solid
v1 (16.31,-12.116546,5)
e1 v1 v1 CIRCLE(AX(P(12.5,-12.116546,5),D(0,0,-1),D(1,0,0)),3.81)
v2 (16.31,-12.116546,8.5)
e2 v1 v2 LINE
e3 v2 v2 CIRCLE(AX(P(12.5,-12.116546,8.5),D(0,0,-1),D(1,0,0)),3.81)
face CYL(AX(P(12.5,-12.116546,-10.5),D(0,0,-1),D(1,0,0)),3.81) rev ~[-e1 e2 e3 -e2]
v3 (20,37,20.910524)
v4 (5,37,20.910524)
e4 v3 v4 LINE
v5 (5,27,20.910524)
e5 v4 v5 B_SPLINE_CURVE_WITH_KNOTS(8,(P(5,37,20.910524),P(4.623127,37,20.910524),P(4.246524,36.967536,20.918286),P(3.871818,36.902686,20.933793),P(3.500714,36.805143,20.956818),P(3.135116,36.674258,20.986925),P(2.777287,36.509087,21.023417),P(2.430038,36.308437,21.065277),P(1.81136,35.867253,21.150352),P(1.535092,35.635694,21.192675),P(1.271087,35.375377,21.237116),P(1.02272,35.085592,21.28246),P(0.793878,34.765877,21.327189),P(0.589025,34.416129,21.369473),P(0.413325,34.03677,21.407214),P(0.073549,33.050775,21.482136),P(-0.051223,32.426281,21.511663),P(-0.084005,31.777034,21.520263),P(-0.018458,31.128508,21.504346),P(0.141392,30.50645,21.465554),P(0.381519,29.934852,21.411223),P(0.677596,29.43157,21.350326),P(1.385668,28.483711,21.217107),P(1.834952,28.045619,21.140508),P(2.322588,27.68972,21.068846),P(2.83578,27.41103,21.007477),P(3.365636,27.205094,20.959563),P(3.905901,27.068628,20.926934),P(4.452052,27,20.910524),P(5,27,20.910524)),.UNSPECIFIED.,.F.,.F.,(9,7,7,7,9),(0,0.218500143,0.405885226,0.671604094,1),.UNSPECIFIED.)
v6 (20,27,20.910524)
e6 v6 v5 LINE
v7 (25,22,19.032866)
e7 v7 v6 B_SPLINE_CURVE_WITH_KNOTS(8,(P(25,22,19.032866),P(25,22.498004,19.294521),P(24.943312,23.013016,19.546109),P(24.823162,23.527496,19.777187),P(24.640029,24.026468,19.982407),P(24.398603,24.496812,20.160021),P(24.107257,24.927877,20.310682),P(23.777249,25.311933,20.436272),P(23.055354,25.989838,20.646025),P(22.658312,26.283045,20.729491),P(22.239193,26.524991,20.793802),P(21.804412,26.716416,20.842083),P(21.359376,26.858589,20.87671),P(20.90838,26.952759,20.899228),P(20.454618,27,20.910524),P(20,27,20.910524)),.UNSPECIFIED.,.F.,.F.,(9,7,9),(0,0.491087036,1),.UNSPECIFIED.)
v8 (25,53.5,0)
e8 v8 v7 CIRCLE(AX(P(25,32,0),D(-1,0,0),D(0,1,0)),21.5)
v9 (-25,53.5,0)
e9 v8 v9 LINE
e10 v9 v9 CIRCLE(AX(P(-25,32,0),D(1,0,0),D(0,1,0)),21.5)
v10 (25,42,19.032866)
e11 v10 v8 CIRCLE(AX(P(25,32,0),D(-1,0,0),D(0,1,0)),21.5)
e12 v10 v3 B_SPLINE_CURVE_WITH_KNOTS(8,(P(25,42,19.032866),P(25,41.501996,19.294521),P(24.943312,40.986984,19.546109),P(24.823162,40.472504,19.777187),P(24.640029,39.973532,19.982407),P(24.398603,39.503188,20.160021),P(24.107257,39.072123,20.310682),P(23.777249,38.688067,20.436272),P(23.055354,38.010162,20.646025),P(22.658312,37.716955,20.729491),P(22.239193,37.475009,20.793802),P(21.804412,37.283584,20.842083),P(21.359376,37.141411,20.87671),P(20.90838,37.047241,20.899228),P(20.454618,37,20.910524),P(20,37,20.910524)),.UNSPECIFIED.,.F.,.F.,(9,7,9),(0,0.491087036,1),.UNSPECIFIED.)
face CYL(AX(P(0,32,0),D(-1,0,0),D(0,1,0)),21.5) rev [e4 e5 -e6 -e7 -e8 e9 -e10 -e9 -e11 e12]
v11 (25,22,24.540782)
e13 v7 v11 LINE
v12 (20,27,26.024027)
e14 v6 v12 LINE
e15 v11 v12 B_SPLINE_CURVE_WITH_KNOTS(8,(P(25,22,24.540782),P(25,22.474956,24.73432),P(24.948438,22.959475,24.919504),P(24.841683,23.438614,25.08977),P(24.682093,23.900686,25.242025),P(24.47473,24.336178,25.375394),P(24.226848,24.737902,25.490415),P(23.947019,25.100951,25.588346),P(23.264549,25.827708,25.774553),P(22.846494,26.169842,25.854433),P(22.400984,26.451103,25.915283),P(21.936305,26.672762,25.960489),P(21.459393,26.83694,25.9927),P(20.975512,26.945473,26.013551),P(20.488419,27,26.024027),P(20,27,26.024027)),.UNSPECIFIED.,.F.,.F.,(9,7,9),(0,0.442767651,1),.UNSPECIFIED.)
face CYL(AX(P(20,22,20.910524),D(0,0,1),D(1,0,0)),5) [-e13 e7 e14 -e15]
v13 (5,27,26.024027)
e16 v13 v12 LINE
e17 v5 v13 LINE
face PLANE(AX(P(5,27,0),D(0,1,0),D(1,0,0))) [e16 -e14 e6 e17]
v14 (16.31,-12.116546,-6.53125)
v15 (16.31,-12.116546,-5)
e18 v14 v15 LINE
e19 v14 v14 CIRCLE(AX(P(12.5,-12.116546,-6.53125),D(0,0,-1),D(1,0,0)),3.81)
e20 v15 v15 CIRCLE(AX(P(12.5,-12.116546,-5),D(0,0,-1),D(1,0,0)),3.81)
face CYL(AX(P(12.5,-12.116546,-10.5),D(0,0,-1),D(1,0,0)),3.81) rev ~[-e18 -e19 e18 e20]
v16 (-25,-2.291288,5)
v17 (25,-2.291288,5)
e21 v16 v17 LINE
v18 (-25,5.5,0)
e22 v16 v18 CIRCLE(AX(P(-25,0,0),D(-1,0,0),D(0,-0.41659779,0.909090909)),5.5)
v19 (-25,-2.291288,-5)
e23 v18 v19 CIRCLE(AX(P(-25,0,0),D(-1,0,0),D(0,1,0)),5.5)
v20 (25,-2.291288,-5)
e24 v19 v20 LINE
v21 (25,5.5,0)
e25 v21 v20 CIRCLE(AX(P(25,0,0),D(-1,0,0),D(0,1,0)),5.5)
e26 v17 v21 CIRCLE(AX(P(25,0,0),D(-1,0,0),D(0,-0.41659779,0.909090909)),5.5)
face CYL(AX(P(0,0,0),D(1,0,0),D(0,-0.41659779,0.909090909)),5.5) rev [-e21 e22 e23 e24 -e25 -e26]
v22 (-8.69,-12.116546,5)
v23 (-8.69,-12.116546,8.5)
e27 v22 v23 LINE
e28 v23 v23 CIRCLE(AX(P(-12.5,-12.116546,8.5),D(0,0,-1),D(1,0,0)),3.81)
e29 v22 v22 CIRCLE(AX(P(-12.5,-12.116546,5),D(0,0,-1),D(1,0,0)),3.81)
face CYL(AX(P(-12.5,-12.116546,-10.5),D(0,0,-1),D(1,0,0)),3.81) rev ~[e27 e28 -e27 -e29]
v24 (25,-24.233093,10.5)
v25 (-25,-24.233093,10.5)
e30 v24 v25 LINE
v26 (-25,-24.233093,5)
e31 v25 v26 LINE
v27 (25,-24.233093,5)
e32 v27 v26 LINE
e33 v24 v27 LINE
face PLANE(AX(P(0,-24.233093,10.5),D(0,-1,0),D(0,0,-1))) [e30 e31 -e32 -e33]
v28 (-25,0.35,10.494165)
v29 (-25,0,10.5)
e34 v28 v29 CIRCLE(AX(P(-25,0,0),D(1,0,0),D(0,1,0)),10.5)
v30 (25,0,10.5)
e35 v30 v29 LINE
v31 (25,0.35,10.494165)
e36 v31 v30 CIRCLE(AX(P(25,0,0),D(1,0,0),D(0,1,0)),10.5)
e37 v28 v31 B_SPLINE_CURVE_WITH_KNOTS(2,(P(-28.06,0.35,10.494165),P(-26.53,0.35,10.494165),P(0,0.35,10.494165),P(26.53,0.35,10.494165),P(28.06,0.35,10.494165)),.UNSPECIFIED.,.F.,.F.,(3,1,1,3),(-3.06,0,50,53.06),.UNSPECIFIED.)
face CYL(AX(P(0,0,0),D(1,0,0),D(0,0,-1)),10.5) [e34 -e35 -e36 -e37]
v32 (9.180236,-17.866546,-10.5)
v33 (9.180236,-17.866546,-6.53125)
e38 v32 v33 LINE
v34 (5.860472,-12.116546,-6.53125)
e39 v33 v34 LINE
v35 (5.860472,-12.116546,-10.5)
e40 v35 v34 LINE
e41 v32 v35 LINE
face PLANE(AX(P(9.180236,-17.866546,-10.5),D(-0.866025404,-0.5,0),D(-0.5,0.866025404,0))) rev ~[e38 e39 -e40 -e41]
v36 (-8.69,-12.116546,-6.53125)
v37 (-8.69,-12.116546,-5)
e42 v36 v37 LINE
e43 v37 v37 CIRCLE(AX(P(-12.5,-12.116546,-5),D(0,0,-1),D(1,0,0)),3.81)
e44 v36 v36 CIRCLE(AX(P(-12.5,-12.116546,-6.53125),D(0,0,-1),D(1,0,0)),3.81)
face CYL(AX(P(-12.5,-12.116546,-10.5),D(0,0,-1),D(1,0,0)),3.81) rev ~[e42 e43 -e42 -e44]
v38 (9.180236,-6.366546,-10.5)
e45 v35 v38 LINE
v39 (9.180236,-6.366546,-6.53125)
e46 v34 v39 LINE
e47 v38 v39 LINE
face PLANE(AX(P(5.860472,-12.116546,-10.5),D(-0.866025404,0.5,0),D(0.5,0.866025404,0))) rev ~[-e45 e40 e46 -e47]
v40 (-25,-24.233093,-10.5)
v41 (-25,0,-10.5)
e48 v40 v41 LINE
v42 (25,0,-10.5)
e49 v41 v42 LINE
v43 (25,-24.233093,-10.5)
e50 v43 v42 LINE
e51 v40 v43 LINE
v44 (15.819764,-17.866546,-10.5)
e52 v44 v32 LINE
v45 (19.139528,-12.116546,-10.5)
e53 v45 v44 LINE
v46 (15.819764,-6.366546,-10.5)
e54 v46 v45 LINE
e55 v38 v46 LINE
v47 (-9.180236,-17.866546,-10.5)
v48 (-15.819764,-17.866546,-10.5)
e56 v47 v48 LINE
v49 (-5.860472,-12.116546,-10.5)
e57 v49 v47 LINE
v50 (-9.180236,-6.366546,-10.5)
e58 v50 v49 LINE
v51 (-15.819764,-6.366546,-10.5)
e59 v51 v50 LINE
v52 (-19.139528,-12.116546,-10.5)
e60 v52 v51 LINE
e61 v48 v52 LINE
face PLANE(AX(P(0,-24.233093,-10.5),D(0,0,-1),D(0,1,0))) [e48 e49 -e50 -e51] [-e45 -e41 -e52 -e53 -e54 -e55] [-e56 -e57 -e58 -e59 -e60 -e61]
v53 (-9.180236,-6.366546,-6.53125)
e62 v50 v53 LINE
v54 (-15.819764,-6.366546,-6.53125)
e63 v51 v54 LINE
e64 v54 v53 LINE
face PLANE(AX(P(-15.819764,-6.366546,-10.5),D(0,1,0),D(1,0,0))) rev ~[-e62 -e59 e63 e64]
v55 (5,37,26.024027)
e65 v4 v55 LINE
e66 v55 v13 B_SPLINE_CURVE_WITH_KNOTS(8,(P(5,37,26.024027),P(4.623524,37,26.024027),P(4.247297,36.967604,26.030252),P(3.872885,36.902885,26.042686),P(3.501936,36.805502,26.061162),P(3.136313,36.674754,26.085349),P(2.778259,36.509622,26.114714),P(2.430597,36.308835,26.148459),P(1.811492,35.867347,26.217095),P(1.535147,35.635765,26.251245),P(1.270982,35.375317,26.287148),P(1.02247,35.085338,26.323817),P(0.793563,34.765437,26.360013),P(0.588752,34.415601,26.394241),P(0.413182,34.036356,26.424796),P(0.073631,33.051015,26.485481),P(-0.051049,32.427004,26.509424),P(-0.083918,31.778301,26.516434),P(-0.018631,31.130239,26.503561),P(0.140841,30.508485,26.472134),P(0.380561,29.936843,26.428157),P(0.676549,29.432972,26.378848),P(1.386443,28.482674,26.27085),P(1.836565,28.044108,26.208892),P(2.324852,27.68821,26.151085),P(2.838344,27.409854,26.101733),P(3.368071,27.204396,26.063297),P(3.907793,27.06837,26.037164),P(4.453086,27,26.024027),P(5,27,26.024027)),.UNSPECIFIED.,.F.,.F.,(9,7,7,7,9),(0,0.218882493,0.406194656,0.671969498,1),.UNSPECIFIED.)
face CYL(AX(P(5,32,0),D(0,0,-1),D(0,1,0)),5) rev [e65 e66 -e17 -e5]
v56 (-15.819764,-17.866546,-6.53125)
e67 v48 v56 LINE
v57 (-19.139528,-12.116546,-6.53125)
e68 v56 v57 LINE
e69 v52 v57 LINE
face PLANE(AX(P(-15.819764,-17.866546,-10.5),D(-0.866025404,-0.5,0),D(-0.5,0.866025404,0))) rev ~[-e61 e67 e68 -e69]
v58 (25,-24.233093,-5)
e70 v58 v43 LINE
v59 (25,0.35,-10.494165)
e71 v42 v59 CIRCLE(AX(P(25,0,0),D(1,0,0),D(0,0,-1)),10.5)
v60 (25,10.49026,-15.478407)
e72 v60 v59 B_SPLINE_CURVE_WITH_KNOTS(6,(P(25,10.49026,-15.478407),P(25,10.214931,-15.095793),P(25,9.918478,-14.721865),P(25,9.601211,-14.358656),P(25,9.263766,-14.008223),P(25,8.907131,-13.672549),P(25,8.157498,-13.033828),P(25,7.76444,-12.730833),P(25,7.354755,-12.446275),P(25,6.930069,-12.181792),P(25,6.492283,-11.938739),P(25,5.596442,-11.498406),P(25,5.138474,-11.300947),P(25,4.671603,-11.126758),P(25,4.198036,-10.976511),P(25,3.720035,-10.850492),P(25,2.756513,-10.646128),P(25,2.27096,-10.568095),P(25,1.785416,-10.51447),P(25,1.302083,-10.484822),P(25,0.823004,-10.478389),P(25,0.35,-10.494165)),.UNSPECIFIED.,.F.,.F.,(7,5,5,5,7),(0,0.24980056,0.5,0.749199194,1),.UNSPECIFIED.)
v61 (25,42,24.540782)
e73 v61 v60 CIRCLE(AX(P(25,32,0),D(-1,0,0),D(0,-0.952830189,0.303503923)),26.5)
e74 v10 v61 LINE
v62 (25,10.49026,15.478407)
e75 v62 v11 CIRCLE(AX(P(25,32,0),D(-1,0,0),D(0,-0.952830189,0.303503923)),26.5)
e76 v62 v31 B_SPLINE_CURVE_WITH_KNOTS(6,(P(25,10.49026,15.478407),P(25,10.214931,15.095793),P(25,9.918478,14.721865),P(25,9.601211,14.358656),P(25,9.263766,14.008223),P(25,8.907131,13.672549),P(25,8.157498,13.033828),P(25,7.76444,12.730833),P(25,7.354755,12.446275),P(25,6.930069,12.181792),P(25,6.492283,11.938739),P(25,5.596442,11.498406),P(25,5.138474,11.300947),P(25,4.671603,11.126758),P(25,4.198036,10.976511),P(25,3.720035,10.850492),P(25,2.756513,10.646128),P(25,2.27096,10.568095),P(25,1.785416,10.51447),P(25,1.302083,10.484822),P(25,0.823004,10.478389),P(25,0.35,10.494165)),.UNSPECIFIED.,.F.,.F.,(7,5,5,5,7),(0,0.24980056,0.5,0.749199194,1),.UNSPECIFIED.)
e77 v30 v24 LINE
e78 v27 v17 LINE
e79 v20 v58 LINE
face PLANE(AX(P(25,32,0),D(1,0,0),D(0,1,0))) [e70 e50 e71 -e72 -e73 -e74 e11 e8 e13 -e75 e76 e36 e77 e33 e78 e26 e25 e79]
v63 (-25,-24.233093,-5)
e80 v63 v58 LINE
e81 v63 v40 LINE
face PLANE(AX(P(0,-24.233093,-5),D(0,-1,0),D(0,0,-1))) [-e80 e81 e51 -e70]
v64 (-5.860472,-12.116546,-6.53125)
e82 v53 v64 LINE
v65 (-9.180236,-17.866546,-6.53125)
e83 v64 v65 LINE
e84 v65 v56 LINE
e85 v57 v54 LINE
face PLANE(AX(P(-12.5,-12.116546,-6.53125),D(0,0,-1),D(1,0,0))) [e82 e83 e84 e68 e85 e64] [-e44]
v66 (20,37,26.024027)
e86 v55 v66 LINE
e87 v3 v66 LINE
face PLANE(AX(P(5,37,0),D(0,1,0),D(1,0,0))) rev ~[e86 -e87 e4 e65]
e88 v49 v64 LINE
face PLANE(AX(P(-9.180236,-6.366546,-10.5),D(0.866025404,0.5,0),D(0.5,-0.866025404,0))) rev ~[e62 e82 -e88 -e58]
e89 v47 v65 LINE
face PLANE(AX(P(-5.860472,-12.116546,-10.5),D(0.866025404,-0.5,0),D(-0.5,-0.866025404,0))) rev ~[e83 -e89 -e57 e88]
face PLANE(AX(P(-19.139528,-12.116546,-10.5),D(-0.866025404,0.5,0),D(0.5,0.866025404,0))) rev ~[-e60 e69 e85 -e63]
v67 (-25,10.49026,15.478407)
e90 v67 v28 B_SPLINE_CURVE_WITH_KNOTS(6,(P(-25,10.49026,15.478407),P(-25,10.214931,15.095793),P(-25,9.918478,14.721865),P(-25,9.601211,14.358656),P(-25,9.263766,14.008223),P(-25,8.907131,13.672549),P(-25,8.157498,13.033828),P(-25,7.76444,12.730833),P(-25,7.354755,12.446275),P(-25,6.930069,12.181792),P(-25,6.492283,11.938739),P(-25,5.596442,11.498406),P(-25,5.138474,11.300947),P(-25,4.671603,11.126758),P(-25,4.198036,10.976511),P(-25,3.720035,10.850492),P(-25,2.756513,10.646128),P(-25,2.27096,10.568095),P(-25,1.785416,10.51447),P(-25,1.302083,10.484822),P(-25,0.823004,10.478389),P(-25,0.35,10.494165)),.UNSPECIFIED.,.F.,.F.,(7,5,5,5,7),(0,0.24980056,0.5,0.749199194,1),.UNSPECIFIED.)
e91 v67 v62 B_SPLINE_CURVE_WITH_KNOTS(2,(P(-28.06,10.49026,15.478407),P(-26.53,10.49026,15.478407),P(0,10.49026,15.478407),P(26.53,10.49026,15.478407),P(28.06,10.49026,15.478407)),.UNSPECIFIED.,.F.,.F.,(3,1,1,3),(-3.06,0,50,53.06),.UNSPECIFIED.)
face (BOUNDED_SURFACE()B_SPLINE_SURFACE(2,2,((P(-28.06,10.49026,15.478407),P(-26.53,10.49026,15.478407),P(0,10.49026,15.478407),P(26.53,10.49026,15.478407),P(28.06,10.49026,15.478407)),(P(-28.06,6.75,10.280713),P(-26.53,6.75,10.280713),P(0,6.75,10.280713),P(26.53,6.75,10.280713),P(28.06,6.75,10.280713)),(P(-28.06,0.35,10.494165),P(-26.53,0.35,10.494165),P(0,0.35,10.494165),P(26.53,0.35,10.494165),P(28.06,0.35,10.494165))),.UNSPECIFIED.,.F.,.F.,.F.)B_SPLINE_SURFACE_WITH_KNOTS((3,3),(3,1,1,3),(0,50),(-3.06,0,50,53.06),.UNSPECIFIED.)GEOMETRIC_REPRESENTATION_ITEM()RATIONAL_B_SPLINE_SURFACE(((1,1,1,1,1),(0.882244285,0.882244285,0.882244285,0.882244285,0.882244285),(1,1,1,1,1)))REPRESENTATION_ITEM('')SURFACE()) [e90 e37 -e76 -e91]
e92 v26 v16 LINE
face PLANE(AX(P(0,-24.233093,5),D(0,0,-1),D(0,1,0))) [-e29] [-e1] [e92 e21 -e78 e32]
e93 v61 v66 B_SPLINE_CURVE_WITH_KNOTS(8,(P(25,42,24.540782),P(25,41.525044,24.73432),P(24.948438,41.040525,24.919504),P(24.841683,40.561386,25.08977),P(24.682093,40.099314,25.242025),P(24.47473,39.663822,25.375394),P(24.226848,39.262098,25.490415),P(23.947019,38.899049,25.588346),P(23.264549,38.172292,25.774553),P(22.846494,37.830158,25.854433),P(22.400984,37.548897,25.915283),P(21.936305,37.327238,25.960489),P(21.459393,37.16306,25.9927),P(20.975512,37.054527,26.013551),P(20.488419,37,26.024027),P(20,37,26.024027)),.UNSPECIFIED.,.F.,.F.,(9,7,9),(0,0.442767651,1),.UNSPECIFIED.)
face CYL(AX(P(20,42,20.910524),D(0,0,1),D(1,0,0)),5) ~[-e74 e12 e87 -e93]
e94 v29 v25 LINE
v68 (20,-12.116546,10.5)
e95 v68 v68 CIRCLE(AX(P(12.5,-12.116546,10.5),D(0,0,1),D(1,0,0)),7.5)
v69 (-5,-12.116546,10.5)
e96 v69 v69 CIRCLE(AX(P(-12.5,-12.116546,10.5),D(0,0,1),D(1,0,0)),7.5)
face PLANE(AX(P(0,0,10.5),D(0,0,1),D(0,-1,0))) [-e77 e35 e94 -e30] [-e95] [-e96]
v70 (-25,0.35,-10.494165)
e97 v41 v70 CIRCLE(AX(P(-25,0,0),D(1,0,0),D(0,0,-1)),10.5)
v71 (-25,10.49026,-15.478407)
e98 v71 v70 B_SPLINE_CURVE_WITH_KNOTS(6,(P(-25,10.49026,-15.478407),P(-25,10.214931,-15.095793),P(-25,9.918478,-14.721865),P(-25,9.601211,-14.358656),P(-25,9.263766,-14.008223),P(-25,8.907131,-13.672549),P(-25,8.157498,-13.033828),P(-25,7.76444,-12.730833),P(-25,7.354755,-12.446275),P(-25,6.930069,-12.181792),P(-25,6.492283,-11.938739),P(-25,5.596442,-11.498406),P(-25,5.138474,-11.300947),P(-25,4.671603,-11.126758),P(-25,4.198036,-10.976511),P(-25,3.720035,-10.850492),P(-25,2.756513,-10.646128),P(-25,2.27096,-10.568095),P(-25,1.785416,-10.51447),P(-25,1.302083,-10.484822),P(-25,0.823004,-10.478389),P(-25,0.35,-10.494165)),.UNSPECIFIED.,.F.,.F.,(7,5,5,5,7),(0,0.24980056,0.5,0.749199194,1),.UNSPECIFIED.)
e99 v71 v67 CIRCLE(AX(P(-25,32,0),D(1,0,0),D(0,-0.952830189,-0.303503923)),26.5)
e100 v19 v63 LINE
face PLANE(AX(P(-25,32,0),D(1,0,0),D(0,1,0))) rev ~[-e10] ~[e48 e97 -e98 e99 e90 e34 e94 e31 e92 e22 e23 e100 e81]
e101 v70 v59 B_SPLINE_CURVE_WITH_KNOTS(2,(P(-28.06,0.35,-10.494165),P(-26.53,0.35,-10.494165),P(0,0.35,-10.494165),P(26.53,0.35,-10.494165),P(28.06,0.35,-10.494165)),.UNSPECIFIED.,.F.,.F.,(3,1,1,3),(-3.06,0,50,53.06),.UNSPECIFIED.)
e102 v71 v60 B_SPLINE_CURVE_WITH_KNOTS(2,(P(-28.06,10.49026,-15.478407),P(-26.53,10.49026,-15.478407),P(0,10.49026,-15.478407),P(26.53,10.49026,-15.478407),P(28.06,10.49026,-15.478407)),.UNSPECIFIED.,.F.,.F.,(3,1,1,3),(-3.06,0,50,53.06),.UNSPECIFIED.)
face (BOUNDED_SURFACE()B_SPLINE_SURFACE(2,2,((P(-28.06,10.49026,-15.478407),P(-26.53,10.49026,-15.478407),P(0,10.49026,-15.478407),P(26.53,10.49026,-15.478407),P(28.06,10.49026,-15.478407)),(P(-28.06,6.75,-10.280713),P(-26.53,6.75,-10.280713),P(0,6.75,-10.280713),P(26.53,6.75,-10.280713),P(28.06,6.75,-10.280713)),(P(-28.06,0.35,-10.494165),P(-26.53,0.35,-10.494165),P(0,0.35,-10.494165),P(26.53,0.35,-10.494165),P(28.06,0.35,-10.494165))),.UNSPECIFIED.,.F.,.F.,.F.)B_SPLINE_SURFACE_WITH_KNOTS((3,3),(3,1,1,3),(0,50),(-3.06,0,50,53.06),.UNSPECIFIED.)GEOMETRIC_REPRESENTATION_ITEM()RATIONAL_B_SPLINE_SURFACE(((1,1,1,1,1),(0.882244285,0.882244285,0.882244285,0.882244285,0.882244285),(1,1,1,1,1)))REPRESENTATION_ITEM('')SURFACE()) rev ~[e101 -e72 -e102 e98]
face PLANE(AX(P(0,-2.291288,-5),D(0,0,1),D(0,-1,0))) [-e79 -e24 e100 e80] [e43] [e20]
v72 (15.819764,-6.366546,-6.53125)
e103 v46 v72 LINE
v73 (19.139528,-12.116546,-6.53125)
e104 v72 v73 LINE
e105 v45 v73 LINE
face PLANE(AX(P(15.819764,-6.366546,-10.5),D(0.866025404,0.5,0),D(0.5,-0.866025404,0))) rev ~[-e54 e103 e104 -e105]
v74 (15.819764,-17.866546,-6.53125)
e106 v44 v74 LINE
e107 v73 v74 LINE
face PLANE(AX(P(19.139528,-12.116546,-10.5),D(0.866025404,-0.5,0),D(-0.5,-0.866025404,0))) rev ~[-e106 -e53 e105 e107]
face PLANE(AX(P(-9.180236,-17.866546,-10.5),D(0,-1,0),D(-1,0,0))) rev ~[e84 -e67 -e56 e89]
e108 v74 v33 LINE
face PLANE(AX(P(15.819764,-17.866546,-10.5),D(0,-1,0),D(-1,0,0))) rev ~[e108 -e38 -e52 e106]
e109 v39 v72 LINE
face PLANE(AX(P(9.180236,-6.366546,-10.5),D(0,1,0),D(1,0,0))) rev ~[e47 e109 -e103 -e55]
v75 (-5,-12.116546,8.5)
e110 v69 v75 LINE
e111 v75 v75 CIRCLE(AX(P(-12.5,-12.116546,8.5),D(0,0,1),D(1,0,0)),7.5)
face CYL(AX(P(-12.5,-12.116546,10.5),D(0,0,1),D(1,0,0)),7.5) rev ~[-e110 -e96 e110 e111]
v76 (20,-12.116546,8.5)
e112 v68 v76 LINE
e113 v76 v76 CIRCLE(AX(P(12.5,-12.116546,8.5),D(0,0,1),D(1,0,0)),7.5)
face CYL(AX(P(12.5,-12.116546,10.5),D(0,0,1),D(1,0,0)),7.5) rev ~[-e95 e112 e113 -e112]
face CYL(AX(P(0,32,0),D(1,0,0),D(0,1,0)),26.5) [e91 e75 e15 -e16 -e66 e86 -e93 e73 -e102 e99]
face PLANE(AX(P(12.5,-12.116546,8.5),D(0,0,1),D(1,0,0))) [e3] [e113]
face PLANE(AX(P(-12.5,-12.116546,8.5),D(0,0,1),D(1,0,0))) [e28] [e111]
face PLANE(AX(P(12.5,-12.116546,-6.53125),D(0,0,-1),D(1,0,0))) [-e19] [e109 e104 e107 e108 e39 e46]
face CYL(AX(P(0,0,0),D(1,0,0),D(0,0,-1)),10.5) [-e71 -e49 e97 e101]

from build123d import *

# Parameters (mm, degrees)
F1_DEPTH  = 25
F3_DEPTH  = 3.96875
F4_R      = 3.81
F5_DEPTH  = 21.001
F6_R      = 7.5
F7_DEPTH  = 2
F8_R      = 26.5
F8_R_2    = 21.5
F9_DEPTH  = 25
F10_W     = 41.7897145033
F10_H     = 10
F11_DEPTH = 26.501
F12_R     = 5
F13_R     = 12


# Not quite as in the source:
# - a length typed as a fraction of an inch, garbled in the dataset ("3 / 203.2 mm" for 3/8 in), is restored


with BuildPart() as f1:
    # F0 (on Right) → F1 (new body, symmetric)
    with BuildSketch(Plane.YZ):
        with BuildLine():
            Line((-24.2330926563, 5), (-9.2330926563, 5))
            ThreePointArc((-9.2330926563, 5), (-5.3735463151, 9.0208092763), (0, 10.5))
            Line((0, 10.5), (-24.2330926563, 10.5))
            Line((-24.2330926563, 10.5), (-24.2330926563, 5))
        make_face()
        with BuildLine():
            ThreePointArc((-2.2912878475, 5), (2.9705148408, 4.628827236), (5.5, 0))
            ThreePointArc((5.5, 0), (2.9705148408, -4.628827236), (-2.2912878475, -5))
            Line((-2.2912878475, -5), (-9.2330926563, -5))
            ThreePointArc((-9.2330926563, -5), (-5.3735463151, -9.0208092763), (0, -10.5))
            ThreePointArc((0, -10.5), (7.4246212025, -7.4246212025), (10.5, 0))
            ThreePointArc((10.5, 0), (7.4246212025, 7.4246212025), (0, 10.5))
            ThreePointArc((0, 10.5), (-5.3735463151, 9.0208092763), (-9.2330926563, 5))
            Line((-9.2330926563, 5), (-2.2912878475, 5))
        make_face()
        with BuildLine():
            ThreePointArc((0, -10.5), (-5.3735463151, -9.0208092763), (-9.2330926563, -5))
            Line((-9.2330926563, -5), (-24.2330926563, -5))
            Line((-24.2330926563, -5), (-24.2330926563, -10.5))
            Line((-24.2330926563, -10.5), (0, -10.5))
        make_face()
    extrude(amount=F1_DEPTH, both=True)

    # F2 (on face) → F3 (cut)
    with BuildSketch(Plane(origin=(0, 0, -10.5), x_dir=(1, 0, 0), z_dir=(0, 0, -1))):
        Polygon((19.1395280957, 12.1165463282), (15.8197640478, 17.8665463282), (9.1802359522, 17.8665463282), (5.8604719043, 12.1165463282), (9.1802359522, 6.3665463282), (15.8197640478, 6.3665463282), align=None)
        Polygon((-15.8197640478, 6.3665463282), (-9.1802359522, 6.3665463282), (-5.8604719043, 12.1165463282), (-9.1802359522, 17.8665463282), (-15.8197640478, 17.8665463282), (-19.1395280957, 12.1165463282), align=None)
    extrude(amount=-F3_DEPTH, mode=Mode.SUBTRACT)

    # F4 (on face) → F5 (cut, through all)
    with BuildSketch(Plane(origin=(0, 0, -10.5), x_dir=(1, 0, 0), z_dir=(0, 0, -1))):
        with Locations((12.5, 12.1165463282)):
            Circle(F4_R)
        with Locations((-12.5, 12.1165463282)):
            Circle(F4_R)
    extrude(amount=-F5_DEPTH, mode=Mode.SUBTRACT)

    # F6 (on face) → F7 (cut)
    with BuildSketch(Plane.XY.offset(10.5)):
        with Locations((-12.5, -12.1165463282)):
            Circle(F6_R)
        with Locations((12.5, -12.1165463282)):
            Circle(F6_R)
    extrude(amount=-F7_DEPTH, mode=Mode.SUBTRACT)

    # F8 (on Right) → F9 (join, symmetric)
    with BuildSketch(Plane.YZ):
        with Locations((32, 0)):
            Circle(F8_R)
        with Locations((32, 0)):
            Circle(F8_R_2, mode=Mode.SUBTRACT)
    extrude(amount=F9_DEPTH, both=True)

    # F10 (on Top) → F11 (cut, through all)
    with BuildSketch(Plane.XY):
        with Locations((25.8948572517, 32)):
            Rectangle(F10_W, F10_H)
        with BuildLine():
            ThreePointArc((5, 37), (0, 32), (5, 27))
            Line((5, 27), (5, 37))
        make_face()
    extrude(amount=F11_DEPTH, mode=Mode.SUBTRACT)

    # F12
    f12_edges = [f1.edges().sort_by_distance(p)[0] for p in [
        (25, 27, 23.467276),
        (25, 37, 23.467276),
    ]]
    fillet(f12_edges, radius=F12_R)

    # F13
    f13_edges = [f1.edges().sort_by_distance(p)[0] for p in [
        (0, 6.75, 8.042854),
        (0, 6.75, -8.042854),
    ]]
    fillet(f13_edges, radius=F13_R)


solid = f1.part
